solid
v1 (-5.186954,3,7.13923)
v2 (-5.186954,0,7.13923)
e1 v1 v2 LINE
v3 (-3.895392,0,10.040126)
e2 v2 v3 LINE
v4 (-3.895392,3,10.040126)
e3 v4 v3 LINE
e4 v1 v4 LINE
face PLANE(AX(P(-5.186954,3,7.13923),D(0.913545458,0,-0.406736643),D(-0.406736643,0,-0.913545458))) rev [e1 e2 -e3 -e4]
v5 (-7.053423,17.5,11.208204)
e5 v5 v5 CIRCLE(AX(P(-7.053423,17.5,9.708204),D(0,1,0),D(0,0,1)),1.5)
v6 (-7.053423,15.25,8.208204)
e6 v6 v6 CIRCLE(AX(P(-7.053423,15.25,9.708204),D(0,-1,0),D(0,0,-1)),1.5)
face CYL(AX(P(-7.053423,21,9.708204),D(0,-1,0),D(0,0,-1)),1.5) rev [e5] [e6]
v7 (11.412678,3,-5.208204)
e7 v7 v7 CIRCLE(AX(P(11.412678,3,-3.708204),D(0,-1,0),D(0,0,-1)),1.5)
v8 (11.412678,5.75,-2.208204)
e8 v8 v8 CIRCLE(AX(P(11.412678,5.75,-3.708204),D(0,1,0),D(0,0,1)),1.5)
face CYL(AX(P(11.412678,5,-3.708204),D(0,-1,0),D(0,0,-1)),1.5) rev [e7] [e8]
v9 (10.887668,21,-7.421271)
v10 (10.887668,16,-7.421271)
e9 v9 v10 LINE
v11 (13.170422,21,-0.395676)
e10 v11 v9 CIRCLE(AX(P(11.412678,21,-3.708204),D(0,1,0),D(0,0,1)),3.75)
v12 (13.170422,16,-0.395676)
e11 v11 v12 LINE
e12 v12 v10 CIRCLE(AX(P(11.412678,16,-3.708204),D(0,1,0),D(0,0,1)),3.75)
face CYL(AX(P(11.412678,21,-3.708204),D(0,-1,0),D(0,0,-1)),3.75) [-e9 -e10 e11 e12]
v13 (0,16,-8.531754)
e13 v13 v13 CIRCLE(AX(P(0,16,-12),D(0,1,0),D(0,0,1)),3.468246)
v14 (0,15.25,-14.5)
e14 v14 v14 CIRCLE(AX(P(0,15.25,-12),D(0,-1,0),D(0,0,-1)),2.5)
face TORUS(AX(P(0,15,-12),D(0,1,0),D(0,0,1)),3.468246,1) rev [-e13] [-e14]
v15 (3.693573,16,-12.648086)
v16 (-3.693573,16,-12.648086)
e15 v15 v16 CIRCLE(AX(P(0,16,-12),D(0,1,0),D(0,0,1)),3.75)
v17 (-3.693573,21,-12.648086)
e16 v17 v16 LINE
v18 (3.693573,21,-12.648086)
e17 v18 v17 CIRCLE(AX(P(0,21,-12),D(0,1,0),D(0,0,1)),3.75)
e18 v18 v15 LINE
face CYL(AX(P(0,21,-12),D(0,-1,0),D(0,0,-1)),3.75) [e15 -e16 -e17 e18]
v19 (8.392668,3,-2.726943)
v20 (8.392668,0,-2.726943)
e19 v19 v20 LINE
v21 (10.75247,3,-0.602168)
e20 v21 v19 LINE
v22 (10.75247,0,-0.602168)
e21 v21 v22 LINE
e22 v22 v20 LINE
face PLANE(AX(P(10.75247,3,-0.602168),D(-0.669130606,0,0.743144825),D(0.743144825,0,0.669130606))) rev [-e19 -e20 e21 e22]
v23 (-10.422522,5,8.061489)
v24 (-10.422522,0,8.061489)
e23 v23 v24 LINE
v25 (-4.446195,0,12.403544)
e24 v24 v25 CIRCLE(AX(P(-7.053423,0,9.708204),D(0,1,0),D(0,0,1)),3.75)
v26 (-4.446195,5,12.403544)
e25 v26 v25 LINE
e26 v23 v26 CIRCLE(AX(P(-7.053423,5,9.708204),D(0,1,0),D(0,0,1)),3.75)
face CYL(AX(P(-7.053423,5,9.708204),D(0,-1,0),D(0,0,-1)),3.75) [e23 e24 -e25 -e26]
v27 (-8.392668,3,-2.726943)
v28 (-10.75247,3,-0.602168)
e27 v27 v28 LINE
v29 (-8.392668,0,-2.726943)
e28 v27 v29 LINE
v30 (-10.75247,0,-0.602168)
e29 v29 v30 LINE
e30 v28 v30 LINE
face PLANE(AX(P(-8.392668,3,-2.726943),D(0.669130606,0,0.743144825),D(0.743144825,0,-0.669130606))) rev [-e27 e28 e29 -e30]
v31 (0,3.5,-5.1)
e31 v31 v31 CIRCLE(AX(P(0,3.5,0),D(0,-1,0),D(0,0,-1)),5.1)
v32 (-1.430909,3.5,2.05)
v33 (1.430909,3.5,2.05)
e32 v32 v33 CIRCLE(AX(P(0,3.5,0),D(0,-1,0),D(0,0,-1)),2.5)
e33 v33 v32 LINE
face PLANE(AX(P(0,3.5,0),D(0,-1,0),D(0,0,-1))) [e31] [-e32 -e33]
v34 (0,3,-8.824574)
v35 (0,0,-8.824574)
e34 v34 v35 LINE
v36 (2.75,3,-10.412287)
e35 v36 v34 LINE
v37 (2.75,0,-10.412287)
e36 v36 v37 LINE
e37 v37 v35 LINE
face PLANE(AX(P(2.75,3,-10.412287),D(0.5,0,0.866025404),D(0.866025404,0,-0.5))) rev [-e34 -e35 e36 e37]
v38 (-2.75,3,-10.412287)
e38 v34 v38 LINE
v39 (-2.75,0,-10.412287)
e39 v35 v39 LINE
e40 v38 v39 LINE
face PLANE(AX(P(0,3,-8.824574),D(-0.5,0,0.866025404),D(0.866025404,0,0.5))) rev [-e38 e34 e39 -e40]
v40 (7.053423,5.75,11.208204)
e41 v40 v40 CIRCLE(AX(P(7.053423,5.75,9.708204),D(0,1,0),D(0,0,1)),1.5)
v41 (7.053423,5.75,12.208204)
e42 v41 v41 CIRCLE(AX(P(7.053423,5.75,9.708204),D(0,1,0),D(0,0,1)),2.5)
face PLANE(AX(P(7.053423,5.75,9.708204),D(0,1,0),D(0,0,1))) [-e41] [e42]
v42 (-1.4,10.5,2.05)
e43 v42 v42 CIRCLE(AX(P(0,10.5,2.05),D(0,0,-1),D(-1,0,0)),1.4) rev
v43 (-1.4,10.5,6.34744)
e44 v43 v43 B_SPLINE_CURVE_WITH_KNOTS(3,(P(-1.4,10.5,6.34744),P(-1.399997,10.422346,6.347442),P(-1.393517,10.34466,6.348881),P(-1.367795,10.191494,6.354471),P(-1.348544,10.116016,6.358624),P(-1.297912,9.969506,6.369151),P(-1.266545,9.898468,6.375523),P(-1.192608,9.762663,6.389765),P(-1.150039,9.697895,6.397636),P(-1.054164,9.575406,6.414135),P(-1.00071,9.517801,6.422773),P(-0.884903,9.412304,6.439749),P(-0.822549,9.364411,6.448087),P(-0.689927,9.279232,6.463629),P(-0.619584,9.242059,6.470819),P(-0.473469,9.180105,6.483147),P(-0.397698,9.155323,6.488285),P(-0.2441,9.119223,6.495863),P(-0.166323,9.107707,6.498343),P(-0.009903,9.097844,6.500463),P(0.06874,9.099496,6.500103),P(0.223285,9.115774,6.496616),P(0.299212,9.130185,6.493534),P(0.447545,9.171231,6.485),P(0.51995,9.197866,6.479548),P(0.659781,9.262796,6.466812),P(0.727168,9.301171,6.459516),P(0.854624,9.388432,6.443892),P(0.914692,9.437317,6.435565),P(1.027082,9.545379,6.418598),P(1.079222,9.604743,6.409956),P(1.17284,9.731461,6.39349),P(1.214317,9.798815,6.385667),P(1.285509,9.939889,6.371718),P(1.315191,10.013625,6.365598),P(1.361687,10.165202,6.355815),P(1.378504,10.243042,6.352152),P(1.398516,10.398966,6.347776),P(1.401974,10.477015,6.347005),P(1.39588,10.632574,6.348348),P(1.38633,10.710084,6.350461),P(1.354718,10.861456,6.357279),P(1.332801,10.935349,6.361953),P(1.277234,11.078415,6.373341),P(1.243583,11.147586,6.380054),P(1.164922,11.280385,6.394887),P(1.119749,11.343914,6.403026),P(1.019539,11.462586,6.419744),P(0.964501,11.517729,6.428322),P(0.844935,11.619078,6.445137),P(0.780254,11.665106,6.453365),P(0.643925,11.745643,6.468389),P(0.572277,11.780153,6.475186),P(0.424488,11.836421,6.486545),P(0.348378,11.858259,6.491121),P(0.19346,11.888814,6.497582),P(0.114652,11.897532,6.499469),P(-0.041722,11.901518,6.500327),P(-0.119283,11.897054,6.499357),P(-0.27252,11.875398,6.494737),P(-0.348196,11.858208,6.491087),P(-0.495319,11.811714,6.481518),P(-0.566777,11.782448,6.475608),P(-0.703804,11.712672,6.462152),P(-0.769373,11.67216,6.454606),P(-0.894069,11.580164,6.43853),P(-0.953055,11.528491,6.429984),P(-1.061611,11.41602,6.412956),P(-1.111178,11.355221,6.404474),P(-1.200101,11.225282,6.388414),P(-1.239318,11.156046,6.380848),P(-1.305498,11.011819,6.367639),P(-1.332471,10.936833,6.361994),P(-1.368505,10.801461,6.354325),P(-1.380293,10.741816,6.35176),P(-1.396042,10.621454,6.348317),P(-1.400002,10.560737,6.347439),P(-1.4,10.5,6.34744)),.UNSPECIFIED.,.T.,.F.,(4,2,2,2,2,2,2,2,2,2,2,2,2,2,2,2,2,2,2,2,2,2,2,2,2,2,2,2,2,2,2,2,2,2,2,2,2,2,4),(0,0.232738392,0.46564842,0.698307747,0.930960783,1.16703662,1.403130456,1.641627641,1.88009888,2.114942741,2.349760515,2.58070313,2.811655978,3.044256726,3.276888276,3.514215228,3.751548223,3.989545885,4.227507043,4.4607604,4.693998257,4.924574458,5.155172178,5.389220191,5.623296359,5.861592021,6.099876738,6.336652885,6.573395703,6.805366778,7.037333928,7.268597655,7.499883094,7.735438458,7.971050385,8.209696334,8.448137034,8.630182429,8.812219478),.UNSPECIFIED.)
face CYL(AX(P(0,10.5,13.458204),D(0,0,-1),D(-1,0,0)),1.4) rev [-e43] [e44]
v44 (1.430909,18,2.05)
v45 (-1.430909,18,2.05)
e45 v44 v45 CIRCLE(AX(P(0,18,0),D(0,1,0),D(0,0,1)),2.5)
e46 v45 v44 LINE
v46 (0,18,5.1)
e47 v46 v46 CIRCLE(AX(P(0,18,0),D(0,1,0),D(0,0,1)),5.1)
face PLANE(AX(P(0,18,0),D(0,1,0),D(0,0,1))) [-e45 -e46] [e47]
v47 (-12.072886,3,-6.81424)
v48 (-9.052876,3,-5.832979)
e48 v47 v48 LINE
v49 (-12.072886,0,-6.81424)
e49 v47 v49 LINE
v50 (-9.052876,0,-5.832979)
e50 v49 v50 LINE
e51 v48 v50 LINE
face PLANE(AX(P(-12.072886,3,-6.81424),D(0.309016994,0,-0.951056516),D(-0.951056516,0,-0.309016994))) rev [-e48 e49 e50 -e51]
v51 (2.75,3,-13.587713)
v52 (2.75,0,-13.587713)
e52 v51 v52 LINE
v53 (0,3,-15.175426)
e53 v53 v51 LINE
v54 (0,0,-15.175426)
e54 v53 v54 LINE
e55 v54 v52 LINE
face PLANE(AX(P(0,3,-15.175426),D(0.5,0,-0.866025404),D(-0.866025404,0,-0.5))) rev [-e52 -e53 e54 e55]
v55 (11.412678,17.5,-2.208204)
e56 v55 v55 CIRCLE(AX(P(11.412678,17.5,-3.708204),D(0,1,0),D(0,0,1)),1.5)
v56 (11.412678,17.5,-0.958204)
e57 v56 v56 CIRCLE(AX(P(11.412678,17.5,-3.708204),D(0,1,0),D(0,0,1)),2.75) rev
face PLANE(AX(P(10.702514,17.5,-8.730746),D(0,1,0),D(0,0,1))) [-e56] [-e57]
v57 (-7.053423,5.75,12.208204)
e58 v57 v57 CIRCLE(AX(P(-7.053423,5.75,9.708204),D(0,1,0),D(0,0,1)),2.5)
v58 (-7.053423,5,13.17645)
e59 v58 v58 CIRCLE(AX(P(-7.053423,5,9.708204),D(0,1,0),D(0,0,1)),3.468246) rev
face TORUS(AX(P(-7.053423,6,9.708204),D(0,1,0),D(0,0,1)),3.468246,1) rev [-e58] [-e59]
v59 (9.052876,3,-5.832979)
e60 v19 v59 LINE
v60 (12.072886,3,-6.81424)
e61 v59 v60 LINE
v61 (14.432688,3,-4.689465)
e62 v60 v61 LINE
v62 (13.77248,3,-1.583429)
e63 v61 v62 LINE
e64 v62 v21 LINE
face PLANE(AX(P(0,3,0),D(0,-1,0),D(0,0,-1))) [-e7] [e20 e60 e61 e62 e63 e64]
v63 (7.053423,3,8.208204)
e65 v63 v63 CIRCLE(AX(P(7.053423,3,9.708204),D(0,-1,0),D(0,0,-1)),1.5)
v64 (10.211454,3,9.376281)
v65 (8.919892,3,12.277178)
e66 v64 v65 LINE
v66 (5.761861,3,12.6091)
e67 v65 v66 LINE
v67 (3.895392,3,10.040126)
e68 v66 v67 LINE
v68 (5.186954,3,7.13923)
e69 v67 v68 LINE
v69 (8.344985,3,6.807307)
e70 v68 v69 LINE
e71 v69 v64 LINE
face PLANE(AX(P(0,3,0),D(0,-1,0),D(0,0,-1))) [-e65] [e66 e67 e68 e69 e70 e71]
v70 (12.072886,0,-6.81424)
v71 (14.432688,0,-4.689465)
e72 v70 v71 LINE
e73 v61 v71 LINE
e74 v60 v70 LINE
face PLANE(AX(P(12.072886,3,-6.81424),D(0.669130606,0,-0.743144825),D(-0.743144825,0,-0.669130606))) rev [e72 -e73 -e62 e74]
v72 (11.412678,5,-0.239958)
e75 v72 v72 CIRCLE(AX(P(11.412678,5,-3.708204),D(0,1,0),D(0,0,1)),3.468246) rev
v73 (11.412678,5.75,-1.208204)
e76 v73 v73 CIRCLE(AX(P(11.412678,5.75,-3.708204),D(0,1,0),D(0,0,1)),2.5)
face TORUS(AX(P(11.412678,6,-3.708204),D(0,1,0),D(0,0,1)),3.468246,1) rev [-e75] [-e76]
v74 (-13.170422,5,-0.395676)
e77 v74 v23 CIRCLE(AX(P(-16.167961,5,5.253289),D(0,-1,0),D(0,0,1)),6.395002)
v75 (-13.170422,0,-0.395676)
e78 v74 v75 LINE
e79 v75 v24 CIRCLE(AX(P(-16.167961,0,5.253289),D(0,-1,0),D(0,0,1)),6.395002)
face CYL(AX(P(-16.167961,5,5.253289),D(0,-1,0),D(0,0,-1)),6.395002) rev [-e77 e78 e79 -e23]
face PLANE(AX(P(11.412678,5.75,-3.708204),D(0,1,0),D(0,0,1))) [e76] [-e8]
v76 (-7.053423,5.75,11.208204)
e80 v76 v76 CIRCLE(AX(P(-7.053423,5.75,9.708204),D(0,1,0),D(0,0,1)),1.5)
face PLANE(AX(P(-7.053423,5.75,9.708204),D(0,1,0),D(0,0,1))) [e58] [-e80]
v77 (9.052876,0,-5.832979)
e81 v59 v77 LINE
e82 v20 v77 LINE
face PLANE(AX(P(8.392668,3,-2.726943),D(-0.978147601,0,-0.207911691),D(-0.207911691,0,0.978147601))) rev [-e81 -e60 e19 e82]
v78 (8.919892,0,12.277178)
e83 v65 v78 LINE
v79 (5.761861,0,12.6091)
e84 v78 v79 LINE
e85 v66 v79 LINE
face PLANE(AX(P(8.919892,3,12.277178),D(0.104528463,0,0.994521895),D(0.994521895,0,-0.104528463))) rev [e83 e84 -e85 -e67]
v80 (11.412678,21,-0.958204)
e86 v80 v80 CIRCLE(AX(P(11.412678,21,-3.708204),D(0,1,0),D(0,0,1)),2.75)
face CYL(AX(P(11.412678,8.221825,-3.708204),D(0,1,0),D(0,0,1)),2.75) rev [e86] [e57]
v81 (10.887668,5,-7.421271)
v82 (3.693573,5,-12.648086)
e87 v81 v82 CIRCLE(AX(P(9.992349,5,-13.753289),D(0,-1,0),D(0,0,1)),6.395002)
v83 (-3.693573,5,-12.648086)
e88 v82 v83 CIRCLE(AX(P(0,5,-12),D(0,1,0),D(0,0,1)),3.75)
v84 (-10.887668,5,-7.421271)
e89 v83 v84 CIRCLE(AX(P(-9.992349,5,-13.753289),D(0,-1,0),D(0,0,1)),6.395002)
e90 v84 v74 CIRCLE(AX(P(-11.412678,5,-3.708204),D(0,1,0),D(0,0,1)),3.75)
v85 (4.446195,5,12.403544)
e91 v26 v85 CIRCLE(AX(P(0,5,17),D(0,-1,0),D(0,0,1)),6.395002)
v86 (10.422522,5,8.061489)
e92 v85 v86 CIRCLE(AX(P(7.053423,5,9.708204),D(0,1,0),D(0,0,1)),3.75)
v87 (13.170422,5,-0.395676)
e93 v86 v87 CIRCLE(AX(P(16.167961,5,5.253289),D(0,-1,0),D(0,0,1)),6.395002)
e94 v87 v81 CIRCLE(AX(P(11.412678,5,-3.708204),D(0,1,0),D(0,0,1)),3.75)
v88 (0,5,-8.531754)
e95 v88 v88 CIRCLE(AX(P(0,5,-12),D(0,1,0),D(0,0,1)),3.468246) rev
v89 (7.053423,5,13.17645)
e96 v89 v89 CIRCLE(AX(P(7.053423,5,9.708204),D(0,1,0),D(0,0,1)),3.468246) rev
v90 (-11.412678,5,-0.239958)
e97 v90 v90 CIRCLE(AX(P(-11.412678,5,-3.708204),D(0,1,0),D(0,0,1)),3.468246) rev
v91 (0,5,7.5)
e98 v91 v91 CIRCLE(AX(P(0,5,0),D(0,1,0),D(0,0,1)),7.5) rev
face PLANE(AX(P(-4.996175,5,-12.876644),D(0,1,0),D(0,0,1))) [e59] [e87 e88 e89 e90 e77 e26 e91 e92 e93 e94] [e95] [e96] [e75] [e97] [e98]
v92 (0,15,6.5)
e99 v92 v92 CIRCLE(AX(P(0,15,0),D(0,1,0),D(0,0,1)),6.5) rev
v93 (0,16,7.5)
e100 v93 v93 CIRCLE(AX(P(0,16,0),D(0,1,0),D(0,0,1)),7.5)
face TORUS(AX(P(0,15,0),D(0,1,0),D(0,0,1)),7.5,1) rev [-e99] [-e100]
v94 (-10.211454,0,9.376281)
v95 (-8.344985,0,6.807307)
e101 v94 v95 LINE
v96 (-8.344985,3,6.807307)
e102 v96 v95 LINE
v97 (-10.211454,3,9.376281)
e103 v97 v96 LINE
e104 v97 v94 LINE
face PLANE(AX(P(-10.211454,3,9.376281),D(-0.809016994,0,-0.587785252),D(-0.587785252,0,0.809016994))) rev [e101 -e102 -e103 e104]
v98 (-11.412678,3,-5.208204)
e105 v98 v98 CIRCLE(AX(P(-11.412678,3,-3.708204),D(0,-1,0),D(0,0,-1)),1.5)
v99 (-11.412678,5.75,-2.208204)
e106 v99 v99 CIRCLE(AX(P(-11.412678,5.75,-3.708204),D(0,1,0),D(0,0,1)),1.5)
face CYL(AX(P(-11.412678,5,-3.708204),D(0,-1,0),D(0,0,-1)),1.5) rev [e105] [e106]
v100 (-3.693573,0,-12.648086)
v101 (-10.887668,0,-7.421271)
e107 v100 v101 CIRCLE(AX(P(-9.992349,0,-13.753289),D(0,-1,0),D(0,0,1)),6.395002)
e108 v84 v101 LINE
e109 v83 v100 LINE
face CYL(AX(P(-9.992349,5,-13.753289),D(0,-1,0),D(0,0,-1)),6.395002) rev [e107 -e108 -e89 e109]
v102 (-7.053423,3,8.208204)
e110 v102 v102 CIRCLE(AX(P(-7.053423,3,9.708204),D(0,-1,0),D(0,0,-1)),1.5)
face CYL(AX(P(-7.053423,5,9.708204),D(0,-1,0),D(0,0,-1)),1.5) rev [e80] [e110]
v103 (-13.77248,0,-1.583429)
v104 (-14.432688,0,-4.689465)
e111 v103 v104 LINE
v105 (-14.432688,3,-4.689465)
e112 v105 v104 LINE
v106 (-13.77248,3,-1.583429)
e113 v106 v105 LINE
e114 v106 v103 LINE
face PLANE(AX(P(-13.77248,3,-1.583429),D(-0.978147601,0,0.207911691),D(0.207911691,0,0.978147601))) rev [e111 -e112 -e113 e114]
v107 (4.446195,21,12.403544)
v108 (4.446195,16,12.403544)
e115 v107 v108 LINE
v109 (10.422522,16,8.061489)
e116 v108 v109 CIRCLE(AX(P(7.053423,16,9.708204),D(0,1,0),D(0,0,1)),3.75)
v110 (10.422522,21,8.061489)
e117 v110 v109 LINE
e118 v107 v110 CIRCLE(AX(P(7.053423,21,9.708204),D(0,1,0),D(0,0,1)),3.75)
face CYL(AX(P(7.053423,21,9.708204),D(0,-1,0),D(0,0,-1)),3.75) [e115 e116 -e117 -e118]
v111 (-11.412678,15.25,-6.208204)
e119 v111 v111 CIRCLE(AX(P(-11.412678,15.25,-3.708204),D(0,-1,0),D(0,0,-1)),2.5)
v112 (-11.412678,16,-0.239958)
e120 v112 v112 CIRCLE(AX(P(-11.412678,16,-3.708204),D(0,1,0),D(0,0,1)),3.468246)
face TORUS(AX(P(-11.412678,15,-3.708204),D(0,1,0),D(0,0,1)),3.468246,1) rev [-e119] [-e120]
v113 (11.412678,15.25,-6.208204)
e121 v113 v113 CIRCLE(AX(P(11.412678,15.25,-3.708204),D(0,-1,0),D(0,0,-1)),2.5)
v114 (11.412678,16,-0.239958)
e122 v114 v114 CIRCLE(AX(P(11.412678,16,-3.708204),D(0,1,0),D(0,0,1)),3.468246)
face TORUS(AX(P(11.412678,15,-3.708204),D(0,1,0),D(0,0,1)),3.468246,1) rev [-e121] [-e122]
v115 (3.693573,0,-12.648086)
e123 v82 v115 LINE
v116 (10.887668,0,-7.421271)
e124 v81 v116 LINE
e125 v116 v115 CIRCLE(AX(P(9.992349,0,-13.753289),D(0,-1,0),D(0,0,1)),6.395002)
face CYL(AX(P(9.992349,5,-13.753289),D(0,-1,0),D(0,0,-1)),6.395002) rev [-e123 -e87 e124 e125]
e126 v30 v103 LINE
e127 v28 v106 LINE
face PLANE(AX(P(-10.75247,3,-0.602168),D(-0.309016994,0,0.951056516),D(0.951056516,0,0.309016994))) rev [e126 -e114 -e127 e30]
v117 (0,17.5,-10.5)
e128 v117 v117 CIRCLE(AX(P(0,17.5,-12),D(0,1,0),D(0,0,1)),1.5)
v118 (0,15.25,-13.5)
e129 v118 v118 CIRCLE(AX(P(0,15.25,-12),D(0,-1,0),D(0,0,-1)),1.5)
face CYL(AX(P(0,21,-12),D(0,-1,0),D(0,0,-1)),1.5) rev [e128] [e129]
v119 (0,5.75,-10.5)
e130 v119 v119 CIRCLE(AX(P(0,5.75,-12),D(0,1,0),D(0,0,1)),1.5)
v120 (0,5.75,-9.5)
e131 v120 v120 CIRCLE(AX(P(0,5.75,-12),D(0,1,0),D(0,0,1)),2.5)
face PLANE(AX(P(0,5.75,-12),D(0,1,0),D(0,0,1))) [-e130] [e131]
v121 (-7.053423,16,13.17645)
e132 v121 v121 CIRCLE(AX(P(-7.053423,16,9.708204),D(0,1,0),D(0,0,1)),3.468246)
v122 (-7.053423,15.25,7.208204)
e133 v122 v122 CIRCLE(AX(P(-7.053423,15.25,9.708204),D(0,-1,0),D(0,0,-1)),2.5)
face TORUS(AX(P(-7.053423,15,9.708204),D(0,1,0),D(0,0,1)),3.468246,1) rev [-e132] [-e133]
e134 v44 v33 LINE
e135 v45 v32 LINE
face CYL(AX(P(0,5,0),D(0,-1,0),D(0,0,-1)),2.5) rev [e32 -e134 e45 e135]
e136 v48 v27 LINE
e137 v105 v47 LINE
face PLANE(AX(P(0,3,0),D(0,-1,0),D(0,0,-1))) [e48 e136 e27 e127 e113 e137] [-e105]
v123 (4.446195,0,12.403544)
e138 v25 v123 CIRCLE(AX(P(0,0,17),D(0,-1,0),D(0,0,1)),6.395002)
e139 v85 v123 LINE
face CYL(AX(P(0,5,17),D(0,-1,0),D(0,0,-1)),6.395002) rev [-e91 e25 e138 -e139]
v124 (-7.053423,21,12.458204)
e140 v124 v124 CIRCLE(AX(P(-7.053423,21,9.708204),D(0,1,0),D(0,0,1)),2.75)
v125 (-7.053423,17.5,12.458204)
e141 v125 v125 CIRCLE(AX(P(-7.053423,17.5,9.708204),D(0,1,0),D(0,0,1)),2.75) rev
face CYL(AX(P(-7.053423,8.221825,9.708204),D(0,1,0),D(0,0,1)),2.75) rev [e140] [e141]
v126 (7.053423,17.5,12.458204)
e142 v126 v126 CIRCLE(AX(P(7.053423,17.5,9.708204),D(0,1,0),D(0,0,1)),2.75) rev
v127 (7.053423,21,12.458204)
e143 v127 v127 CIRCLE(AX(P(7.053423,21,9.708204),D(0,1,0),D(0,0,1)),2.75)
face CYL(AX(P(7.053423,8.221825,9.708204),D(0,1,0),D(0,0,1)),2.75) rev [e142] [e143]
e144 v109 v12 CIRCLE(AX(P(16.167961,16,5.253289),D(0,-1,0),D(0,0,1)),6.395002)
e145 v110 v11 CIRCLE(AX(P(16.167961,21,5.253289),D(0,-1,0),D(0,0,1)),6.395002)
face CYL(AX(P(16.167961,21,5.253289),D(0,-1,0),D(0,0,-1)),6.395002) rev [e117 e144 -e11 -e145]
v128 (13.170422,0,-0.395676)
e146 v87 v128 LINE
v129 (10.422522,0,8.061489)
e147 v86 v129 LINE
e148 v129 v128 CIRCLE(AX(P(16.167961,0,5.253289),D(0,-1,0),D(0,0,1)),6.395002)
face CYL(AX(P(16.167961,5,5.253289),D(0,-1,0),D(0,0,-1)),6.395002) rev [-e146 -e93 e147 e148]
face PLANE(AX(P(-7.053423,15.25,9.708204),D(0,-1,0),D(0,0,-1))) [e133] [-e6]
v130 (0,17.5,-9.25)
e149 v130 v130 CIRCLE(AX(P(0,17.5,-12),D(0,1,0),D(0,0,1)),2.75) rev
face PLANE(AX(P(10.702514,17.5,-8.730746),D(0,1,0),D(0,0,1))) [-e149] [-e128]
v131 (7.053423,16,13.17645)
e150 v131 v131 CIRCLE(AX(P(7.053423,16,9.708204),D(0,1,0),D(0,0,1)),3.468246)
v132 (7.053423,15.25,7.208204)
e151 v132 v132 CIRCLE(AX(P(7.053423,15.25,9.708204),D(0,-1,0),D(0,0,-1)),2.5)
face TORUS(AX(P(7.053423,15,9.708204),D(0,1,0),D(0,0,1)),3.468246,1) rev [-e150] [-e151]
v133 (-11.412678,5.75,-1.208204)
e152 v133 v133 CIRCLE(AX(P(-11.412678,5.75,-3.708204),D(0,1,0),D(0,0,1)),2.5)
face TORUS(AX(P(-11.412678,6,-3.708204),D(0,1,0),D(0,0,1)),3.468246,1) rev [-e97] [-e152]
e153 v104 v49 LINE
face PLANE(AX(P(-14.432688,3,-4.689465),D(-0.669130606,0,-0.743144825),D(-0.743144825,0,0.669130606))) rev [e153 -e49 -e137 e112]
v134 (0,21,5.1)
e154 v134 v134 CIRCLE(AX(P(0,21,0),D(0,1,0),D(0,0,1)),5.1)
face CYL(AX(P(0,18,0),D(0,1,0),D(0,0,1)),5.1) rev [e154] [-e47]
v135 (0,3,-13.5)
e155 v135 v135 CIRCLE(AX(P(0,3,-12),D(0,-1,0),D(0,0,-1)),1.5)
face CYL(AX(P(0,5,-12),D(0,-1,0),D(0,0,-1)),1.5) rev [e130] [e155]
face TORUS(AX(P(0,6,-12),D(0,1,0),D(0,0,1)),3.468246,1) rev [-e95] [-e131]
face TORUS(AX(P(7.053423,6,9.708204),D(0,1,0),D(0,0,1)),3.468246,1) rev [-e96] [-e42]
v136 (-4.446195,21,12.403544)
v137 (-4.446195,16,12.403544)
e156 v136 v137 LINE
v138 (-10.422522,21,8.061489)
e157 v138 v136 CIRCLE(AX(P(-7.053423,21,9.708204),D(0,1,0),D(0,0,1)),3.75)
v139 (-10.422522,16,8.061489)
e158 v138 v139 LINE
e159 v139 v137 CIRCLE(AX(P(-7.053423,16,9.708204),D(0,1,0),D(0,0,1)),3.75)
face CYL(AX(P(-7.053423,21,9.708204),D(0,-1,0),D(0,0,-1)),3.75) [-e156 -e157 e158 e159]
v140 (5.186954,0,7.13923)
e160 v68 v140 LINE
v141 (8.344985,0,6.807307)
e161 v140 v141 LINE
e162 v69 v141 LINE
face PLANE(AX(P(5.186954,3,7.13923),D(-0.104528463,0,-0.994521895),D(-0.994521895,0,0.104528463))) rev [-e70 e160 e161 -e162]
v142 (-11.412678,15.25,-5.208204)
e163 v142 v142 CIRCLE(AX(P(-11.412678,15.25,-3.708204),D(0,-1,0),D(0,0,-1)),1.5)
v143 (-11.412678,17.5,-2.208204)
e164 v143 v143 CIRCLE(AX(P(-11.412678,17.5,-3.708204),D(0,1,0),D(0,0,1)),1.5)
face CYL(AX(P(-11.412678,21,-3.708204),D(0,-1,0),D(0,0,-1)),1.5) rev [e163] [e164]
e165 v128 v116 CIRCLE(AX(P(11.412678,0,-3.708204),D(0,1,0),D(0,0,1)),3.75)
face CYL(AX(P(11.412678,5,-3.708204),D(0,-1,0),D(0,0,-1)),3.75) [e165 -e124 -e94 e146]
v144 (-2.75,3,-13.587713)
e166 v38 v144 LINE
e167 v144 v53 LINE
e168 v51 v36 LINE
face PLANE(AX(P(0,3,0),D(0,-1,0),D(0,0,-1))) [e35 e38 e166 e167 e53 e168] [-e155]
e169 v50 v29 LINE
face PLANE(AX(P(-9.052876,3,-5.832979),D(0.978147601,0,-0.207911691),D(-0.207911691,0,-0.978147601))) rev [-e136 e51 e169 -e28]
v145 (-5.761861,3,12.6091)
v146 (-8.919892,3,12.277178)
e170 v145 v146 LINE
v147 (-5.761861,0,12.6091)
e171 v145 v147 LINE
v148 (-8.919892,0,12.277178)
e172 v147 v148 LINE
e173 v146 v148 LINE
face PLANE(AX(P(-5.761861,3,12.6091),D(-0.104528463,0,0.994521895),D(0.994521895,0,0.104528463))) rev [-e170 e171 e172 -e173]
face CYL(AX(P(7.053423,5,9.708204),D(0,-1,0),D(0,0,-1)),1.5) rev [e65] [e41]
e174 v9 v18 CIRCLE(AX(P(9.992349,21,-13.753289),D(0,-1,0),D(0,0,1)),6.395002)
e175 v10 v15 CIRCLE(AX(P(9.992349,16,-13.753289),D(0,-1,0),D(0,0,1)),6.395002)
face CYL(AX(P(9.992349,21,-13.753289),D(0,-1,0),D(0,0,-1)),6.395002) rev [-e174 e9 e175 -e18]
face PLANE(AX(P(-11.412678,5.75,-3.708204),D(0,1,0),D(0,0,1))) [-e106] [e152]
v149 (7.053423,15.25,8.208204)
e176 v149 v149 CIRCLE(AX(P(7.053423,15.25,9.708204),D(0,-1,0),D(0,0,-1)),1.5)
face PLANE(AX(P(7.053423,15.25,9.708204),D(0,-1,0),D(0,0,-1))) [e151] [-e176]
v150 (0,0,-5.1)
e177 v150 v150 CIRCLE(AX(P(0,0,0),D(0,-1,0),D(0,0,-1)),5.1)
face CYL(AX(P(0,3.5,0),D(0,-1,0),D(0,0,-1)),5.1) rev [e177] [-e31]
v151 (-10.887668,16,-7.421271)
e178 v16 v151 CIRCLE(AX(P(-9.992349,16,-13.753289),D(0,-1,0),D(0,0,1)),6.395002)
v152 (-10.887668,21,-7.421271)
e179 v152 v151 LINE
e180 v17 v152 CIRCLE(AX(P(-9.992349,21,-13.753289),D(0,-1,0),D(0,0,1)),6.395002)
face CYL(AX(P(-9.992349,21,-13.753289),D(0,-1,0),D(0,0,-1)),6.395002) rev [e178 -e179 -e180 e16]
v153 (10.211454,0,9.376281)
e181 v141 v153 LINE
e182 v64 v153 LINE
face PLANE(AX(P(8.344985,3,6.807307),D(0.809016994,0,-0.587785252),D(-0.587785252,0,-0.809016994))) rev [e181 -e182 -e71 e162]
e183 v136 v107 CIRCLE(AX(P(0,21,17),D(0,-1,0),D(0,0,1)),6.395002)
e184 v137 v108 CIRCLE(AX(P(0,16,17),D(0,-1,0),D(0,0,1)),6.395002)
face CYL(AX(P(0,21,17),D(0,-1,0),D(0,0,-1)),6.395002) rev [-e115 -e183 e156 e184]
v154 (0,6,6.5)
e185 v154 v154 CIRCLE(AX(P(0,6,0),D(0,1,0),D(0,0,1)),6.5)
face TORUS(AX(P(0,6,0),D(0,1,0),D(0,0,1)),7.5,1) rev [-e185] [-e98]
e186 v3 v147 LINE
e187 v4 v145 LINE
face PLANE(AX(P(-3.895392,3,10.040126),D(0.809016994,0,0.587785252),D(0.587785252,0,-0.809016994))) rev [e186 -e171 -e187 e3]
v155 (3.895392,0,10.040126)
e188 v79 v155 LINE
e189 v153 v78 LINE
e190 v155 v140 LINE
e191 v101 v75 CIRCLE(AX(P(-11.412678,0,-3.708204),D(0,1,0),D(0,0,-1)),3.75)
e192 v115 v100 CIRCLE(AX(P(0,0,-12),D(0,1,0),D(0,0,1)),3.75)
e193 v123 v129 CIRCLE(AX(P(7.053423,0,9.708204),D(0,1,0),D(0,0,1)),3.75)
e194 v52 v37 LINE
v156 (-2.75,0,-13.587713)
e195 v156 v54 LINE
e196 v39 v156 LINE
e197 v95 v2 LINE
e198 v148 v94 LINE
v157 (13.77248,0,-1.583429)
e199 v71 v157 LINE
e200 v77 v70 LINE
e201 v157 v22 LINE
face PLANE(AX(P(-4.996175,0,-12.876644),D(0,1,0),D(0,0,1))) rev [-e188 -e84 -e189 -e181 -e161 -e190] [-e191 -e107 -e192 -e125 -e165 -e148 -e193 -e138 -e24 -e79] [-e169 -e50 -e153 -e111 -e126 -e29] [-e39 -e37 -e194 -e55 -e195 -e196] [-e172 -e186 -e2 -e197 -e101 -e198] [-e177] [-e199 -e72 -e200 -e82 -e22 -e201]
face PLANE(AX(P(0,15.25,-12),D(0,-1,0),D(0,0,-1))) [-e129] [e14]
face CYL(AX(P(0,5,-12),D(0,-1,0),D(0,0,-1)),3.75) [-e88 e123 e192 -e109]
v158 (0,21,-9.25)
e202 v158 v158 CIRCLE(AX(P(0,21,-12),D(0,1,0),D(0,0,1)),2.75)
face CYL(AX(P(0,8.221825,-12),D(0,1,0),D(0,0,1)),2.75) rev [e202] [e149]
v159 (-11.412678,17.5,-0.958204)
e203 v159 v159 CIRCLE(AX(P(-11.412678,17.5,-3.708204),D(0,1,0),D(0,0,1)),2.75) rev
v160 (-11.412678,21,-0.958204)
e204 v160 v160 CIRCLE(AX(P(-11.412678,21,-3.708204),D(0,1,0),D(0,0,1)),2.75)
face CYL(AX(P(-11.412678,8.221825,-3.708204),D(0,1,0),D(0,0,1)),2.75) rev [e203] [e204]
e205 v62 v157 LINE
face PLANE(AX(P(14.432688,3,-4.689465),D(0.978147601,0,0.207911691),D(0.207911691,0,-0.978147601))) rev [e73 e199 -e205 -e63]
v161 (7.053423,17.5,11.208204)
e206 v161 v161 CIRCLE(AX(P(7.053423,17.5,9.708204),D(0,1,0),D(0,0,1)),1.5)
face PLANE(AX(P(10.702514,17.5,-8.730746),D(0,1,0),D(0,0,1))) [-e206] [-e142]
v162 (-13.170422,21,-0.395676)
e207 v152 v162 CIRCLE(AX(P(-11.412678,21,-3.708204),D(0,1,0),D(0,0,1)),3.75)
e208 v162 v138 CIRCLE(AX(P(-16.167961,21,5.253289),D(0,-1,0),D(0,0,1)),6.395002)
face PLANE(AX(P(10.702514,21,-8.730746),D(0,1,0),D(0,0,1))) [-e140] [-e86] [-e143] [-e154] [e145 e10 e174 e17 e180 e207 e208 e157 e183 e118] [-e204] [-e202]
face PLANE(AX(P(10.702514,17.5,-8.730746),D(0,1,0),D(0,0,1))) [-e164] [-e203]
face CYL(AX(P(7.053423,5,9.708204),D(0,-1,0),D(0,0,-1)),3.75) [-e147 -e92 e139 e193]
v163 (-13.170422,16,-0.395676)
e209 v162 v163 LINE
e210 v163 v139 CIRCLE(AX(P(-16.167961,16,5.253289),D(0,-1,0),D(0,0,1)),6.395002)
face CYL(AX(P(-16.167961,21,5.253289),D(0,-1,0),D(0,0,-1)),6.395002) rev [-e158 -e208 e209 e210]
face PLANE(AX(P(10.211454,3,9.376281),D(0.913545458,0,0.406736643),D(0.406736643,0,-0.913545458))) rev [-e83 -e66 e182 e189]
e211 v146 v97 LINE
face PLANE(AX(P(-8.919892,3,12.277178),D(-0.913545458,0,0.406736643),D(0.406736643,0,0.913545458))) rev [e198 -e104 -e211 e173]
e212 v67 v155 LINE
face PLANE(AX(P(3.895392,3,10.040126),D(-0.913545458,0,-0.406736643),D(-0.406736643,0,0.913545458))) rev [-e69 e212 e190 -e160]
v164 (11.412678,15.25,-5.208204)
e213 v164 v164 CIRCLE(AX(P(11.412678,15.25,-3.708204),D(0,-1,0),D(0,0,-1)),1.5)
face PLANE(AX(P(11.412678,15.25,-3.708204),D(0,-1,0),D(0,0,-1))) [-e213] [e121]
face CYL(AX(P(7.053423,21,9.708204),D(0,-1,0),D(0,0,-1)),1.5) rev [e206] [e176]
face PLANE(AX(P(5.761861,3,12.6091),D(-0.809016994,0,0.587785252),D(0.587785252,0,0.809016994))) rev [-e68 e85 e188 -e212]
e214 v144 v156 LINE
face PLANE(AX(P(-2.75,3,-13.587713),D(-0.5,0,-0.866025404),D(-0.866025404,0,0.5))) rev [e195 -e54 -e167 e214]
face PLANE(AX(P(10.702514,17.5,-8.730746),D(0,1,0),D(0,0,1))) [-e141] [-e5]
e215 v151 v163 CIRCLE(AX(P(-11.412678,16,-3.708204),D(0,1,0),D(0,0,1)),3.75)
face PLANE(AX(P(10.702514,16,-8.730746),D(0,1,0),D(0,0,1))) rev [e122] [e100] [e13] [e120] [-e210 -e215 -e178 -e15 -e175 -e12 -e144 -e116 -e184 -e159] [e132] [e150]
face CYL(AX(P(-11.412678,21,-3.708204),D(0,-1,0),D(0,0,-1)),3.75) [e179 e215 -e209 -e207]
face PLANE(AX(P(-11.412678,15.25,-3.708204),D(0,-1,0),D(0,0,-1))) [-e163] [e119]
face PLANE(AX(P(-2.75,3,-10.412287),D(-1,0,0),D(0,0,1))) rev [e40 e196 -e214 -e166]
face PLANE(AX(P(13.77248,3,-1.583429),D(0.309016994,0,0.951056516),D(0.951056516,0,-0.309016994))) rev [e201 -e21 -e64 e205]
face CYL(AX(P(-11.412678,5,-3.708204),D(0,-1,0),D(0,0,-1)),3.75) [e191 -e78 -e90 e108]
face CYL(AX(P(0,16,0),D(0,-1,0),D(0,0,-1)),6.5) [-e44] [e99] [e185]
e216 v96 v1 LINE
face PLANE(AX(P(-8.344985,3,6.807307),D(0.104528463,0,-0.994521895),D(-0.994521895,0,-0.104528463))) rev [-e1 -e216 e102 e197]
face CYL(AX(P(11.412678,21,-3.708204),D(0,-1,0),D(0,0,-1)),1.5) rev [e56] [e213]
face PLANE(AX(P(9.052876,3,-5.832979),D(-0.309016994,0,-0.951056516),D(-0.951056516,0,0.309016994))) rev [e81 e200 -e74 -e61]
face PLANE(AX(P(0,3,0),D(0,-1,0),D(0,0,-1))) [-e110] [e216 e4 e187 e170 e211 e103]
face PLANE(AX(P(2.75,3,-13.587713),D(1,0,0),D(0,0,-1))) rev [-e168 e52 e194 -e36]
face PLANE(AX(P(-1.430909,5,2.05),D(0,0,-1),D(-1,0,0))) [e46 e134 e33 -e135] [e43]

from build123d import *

# Parameters (mm, degrees)
SKETCH1_R           = 1.5
BOSS_EXTRUDE1_DEPTH = 5
SKETCH2_R           = 6.5
BOSS_EXTRUDE2_DEPTH = 11
SKETCH3_R           = 1.5
BOSS_EXTRUDE3_DEPTH = 5
SKETCH4_R           = 1.4
CUT_EXTRUDE1_DEPTH  = 31.314506594
FILLET1_R           = 1
CUT_EXTRUDE2_DEPTH  = 3
SKETCH8_R           = 2.5
SKETCH8_R_2         = 1.5
BOSS_EXTRUDE5_DEPTH = 0.75
FILLET4_R           = 1
BOSS_EXTRUDE6_START = 0.75
SKETCH9_R           = 2.5
SKETCH9_R_2         = 1.5
BOSS_EXTRUDE6_DEPTH = 0.75
FILLET5_R           = 1
SKETCH12_R          = 2.75
CUT_EXTRUDE5_DEPTH  = 3.5
SKETCH10_R          = 5.1
CUT_EXTRUDE3_DEPTH  = 3
CUT_EXTRUDE4_START  = -3.5
SKETCH11_R          = 5.1
CUT_EXTRUDE4_DEPTH  = 3.5


with BuildPart() as part:
    # Sketch1 → Boss-Extrude1 (new body)
    with BuildSketch(Plane(origin=(0, 0, 0), x_dir=(1, 0, 0), z_dir=(0, 1, 0))):
        with BuildLine():
            ThreePointArc((-10.887667616, 7.421270575), (-6.233461404, 8.579623579), (-3.693573417, 12.648085961))
            ThreePointArc((-3.693573417, 12.648085961), (0, 15.75), (3.693573417, 12.648085961))
            ThreePointArc((3.693573417, 12.648085961), (6.233461404, 8.579623579), (10.887667616, 7.421270575))
            ThreePointArc((10.887667616, 7.421270575), (14.979140132, 4.867017661), (13.170421528, 0.395676441))
            ThreePointArc((13.170421528, 0.395676441), (10.08595242, -3.277124596), (10.422522062, -8.061488506))
            ThreePointArc((10.422522062, -8.061488506), (9.257617724, -12.742017661), (4.446194733, -12.403544471))
            ThreePointArc((4.446194733, -12.403544471), (0, -10.604997965), (-4.446194733, -12.403544471))
            ThreePointArc((-4.446194733, -12.403544471), (-9.257617724, -12.742017661), (-10.422522062, -8.061488506))
            ThreePointArc((-10.422522062, -8.061488506), (-10.08595242, -3.277124596), (-13.170421528, 0.395676441))
            ThreePointArc((-13.170421528, 0.395676441), (-14.889028798, 2.301972625), (-14.979140132, 4.867017661))
            ThreePointArc((-14.979140132, 4.867017661), (-13.398542888, 6.889216574), (-10.887667616, 7.421270575))
        make_face()
        with Locations(Location((0, 12, 0), (0, 0, 270))):
            Circle(SKETCH1_R, mode=Mode.SUBTRACT)
        with Locations(Location((11.412678196, 3.708203932, 0), (0, 0, 270))):
            Circle(SKETCH1_R, mode=Mode.SUBTRACT)
        with Locations(Location((7.053423028, -9.708203932, 0), (0, 0, 270))):
            Circle(SKETCH1_R, mode=Mode.SUBTRACT)
        with Locations(Location((-7.053423028, -9.708203932, 0), (0, 0, 270))):
            Circle(SKETCH1_R, mode=Mode.SUBTRACT)
        with Locations(Location((-11.412678196, 3.708203932, 0), (0, 0, 270))):
            Circle(SKETCH1_R, mode=Mode.SUBTRACT)
        with BuildLine():
            Line((-1.430908802, -2.05), (1.430908802, -2.05))
            ThreePointArc((1.430908802, -2.05), (0, 2.5), (-1.430908802, -2.05))
        make_face(mode=Mode.SUBTRACT)
    extrude(amount=BOSS_EXTRUDE1_DEPTH)

    # Sketch2 → Boss-Extrude2 (add)
    with BuildSketch(Plane(origin=(0, 5, 0), x_dir=(1, 0, 0), z_dir=(0, 1, 0))):
        with Locations(Location((0, 0, 0), (0, 0, 270))):
            Circle(SKETCH2_R)
        with BuildLine():
            Line((-1.430908802, -2.05), (1.430908802, -2.05))
            ThreePointArc((1.430908802, -2.05), (0, 2.5), (-1.430908802, -2.05))
        make_face(mode=Mode.SUBTRACT)
    extrude(amount=BOSS_EXTRUDE2_DEPTH)

    # Sketch3 → Boss-Extrude3 (add)
    with BuildSketch(Plane(origin=(0, 16, 0), x_dir=(1, 0, 0), z_dir=(0, 1, 0))):
        with BuildLine():
            ThreePointArc((3.693573417, 12.648085961), (0, 15.75), (-3.693573417, 12.648085961))
            ThreePointArc((-3.693573417, 12.648085961), (-6.233461404, 8.579623579), (-10.887667616, 7.421270575))
            ThreePointArc((-10.887667616, 7.421270575), (-14.979140132, 4.867017661), (-13.170421528, 0.395676441))
            ThreePointArc((-13.170421528, 0.395676441), (-10.08595242, -3.277124596), (-10.422522062, -8.061488506))
            ThreePointArc((-10.422522062, -8.061488506), (-9.257617724, -12.742017661), (-4.446194733, -12.403544471))
            ThreePointArc((-4.446194733, -12.403544471), (0, -10.604997965), (4.446194733, -12.403544471))
            ThreePointArc((4.446194733, -12.403544471), (9.257617724, -12.742017661), (10.422522062, -8.061488506))
            ThreePointArc((10.422522062, -8.061488506), (10.08595242, -3.277124596), (13.170421528, 0.395676441))
            ThreePointArc((13.170421528, 0.395676441), (14.979140132, 4.867017661), (10.887667616, 7.421270575))
            ThreePointArc((10.887667616, 7.421270575), (6.233461404, 8.579623579), (3.693573417, 12.648085961))
        make_face()
        with Locations(Location((-7.053423028, -9.708203932, 0), (0, 0, 270))):
            Circle(SKETCH3_R, mode=Mode.SUBTRACT)
        with Locations(Location((7.053423028, -9.708203932, 0), (0, 0, 270))):
            Circle(SKETCH3_R, mode=Mode.SUBTRACT)
        with Locations(Location((11.412678196, 3.708203932, 0), (0, 0, 270))):
            Circle(SKETCH3_R, mode=Mode.SUBTRACT)
        with Locations(Location((-11.412678196, 3.708203932, 0), (0, 0, 270))):
            Circle(SKETCH3_R, mode=Mode.SUBTRACT)
        with Locations(Location((0, 12, 0), (0, 0, 270))):
            Circle(SKETCH3_R, mode=Mode.SUBTRACT)
        with BuildLine():
            Line((-1.430908802, -2.05), (1.430908802, -2.05))
            ThreePointArc((1.430908802, -2.05), (0, 2.5), (-1.430908802, -2.05))
        make_face(mode=Mode.SUBTRACT)
    extrude(amount=BOSS_EXTRUDE3_DEPTH)

    # Sketch4 → Cut-Extrude1 (cut, through all)
    with BuildSketch(Plane.XY):
        with Locations(Location((0, 10.5, 0), (0, 0, 180))):
            Circle(SKETCH4_R)
    extrude(amount=CUT_EXTRUDE1_DEPTH, mode=Mode.SUBTRACT)

    # Fillet1
    fillet1_edges = [part.edges().sort_by_distance(p)[0] for p in [
        (0, 16, -6.5),
        (0, 5, -6.5),
    ]]
    fillet(fillet1_edges, radius=FILLET1_R)

    # Sketch6 → Cut-Extrude2 (cut)
    with BuildSketch(Plane.XZ):
        Polygon((-12.072886484, -6.814239726), (-9.052876438, -5.832978979), (-8.392668149, -2.726943186), (-10.752469907, -0.602168139), (-13.772479953, -1.583428886), (-14.432688242, -4.689464679), align=None)
        Polygon((2.75, -13.58771324), (2.75, -10.41228676), (0, -8.824573519), (-2.75, -10.41228676), (-2.75, -13.58771324), (0, -15.175426481), align=None)
        Polygon((-10.21145419, 9.376281482), (-8.344985335, 6.807307495), (-5.186954173, 7.139229945), (-3.895391865, 10.040126383), (-5.76186072, 12.60910037), (-8.919891883, 12.27717792), align=None)
        Polygon((5.76186072, 12.60910037), (3.895391865, 10.040126383), (5.186954173, 7.139229945), (8.344985335, 6.807307495), (10.21145419, 9.376281482), (8.919891883, 12.27717792), align=None)
        Polygon((13.772479953, -1.583428886), (10.752469907, -0.602168139), (8.392668149, -2.726943186), (9.052876438, -5.832978979), (12.072886484, -6.814239726), (14.432688242, -4.689464679), align=None)
    extrude(amount=-CUT_EXTRUDE2_DEPTH, mode=Mode.SUBTRACT)

    # Sketch8 → Boss-Extrude5 (add)
    # profile 1 of 5: a face of its own
    with BuildSketch(Plane(origin=(0, 5, 0), x_dir=(1, 0, 0), z_dir=(0, 1, 0))):
        with Locations(Location((-7.053423028, -9.708203932, 0), (0, 0, 270))):
            Circle(SKETCH8_R)
        with Locations(Location((-7.053423028, -9.708203932, 0), (0, 0, 90))):
            Circle(SKETCH8_R_2, mode=Mode.SUBTRACT)
    # profile 2 of 5: a face of its own
    with BuildSketch(Plane(origin=(0, 5, 0), x_dir=(1, 0, 0), z_dir=(0, 1, 0))):
        with Locations(Location((-11.412678196, 3.708203932, 0), (0, 0, 270))):
            Circle(SKETCH8_R)
        with Locations(Location((-11.412678196, 3.708203932, 0), (0, 0, 90))):
            Circle(SKETCH8_R_2, mode=Mode.SUBTRACT)
    # profile 3 of 5: a face of its own
    with BuildSketch(Plane(origin=(0, 5, 0), x_dir=(1, 0, 0), z_dir=(0, 1, 0))):
        with Locations(Location((0, 12, 0), (0, 0, 270))):
            Circle(SKETCH8_R)
        with Locations(Location((0, 12, 0), (0, 0, 90))):
            Circle(SKETCH8_R_2, mode=Mode.SUBTRACT)
    # profile 4 of 5: a face of its own
    with BuildSketch(Plane(origin=(0, 5, 0), x_dir=(1, 0, 0), z_dir=(0, 1, 0))):
        with Locations(Location((11.412678196, 3.708203932, 0), (0, 0, 270))):
            Circle(SKETCH8_R)
        with Locations(Location((11.412678196, 3.708203932, 0), (0, 0, 90))):
            Circle(SKETCH8_R_2, mode=Mode.SUBTRACT)
    # profile 5 of 5: a face of its own
    with BuildSketch(Plane(origin=(0, 5, 0), x_dir=(1, 0, 0), z_dir=(0, 1, 0))):
        with Locations(Location((7.053423028, -9.708203932, 0), (0, 0, 270))):
            Circle(SKETCH8_R)
        with Locations(Location((7.053423028, -9.708203932, 0), (0, 0, 90))):
            Circle(SKETCH8_R_2, mode=Mode.SUBTRACT)
    extrude(amount=BOSS_EXTRUDE5_DEPTH)

    # Fillet4
    # the kernel refuses this fillet: 1 mm, written as the material it adds along each edge
    with BuildSketch(Plane(origin=(-7.053423028, 5, 9.708203932), x_dir=(0, 0, 1), z_dir=(-1, 0, 0))) as fillet4_piece_1:
        with BuildLine():
            CenterArc((3.468245837, 1), FILLET4_R, 194.477512186, 75.522487814)
            Line((2.5, 0.75), (2.480635083, 0.745))
            ThreePointArc((2.480635083, 0.745), (2.48, 0.375), (2.48, 0))
            Line((2.48, 0), (2.5, -0.02))
            Line((2.5, -0.02), (3.468245837, -0.02))
            Line((3.468245837, -0.02), (3.468245837, 0))
        make_face()
    revolve(axis=Axis((-7.053423028, 5, 9.708203932), (0, 1, 0)))
    with BuildSketch(Plane(origin=(-11.412678196, 5, -3.708203932), x_dir=(0, 0, 1), z_dir=(-1, 0, 0))) as fillet4_piece_2:
        with BuildLine():
            CenterArc((3.468245837, 1), FILLET4_R, 194.477512186, 75.522487814)
            Line((2.5, 0.75), (2.480635083, 0.745))
            ThreePointArc((2.480635083, 0.745), (2.48, 0.375), (2.48, 0))
            Line((2.48, 0), (2.5, -0.02))
            Line((2.5, -0.02), (3.468245837, -0.02))
            Line((3.468245837, -0.02), (3.468245837, 0))
        make_face()
    revolve(axis=Axis((-11.412678196, 5, -3.708203932), (0, 1, 0)))
    with BuildSketch(Plane(origin=(0, 5, -12), x_dir=(0, 0, 1), z_dir=(-1, 0, 0))) as fillet4_piece_3:
        with BuildLine():
            CenterArc((3.468245837, 1), FILLET4_R, 194.477512186, 75.522487814)
            Line((2.5, 0.75), (2.480635083, 0.745))
            ThreePointArc((2.480635083, 0.745), (2.48, 0.375), (2.48, 0))
            Line((2.48, 0), (2.5, -0.02))
            Line((2.5, -0.02), (3.468245837, -0.02))
            Line((3.468245837, -0.02), (3.468245837, 0))
        make_face()
    revolve(axis=Axis((0, 5, -12), (0, 1, 0)))
    with BuildSketch(Plane(origin=(11.412678196, 5, -3.708203932), x_dir=(0, 0, 1), z_dir=(-1, 0, 0))) as fillet4_piece_4:
        with BuildLine():
            CenterArc((3.468245837, 1), FILLET4_R, 194.477512186, 75.522487814)
            Line((2.5, 0.75), (2.480635083, 0.745))
            ThreePointArc((2.480635083, 0.745), (2.48, 0.375), (2.48, 0))
            Line((2.48, 0), (2.5, -0.02))
            Line((2.5, -0.02), (3.468245837, -0.02))
            Line((3.468245837, -0.02), (3.468245837, 0))
        make_face()
    revolve(axis=Axis((11.412678196, 5, -3.708203932), (0, 1, 0)))
    with BuildSketch(Plane(origin=(7.053423028, 5, 9.708203932), x_dir=(0, 0, 1), z_dir=(-1, 0, 0))) as fillet4_piece_5:
        with BuildLine():
            CenterArc((3.468245837, 1), FILLET4_R, 194.477512186, 75.522487814)
            Line((2.5, 0.75), (2.480635083, 0.745))
            ThreePointArc((2.480635083, 0.745), (2.48, 0.375), (2.48, 0))
            Line((2.48, 0), (2.5, -0.02))
            Line((2.5, -0.02), (3.468245837, -0.02))
            Line((3.468245837, -0.02), (3.468245837, 0))
        make_face()
    revolve(axis=Axis((7.053423028, 5, 9.708203932), (0, 1, 0)))

    # Sketch9 → Boss-Extrude6 (add)
    # profile 1 of 5: a face of its own
    with BuildSketch(Plane.XZ.offset(-16).offset(BOSS_EXTRUDE6_START)):
        with Locations(Location((0, -12, 0), (0, 0, 90))):
            Circle(SKETCH9_R)
        with Locations(Location((0, -12, 0), (0, 0, 270))):
            Circle(SKETCH9_R_2, mode=Mode.SUBTRACT)
    # profile 2 of 5: a face of its own
    with BuildSketch(Plane.XZ.offset(-16).offset(BOSS_EXTRUDE6_START)):
        with Locations(Location((-11.412678196, -3.708203932, 0), (0, 0, 90))):
            Circle(SKETCH9_R)
        with Locations(Location((-11.412678196, -3.708203932, 0), (0, 0, 270))):
            Circle(SKETCH9_R_2, mode=Mode.SUBTRACT)
    # profile 3 of 5: a face of its own
    with BuildSketch(Plane.XZ.offset(-16).offset(BOSS_EXTRUDE6_START)):
        with Locations(Location((-7.053423028, 9.708203932, 0), (0, 0, 90))):
            Circle(SKETCH9_R)
        with Locations(Location((-7.053423028, 9.708203932, 0), (0, 0, 270))):
            Circle(SKETCH9_R_2, mode=Mode.SUBTRACT)
    # profile 4 of 5: a face of its own
    with BuildSketch(Plane.XZ.offset(-16).offset(BOSS_EXTRUDE6_START)):
        with Locations(Location((7.053423028, 9.708203932, 0), (0, 0, 90))):
            Circle(SKETCH9_R)
        with Locations(Location((7.053423028, 9.708203932, 0), (0, 0, 270))):
            Circle(SKETCH9_R_2, mode=Mode.SUBTRACT)
    # profile 5 of 5: a face of its own
    with BuildSketch(Plane.XZ.offset(-16).offset(BOSS_EXTRUDE6_START)):
        with Locations(Location((11.412678196, -3.708203932, 0), (0, 0, 90))):
            Circle(SKETCH9_R)
        with Locations(Location((11.412678196, -3.708203932, 0), (0, 0, 270))):
            Circle(SKETCH9_R_2, mode=Mode.SUBTRACT)
    extrude(amount=-BOSS_EXTRUDE6_DEPTH)

    # Fillet5
    # the kernel refuses this fillet: 1 mm, written as the material it adds along each edge
    with BuildSketch(Plane(origin=(0, 16, -12), x_dir=(0, 0, 1), z_dir=(1, 0, 0))) as fillet5_piece_1:
        with BuildLine():
            CenterArc((3.468245837, 1), FILLET5_R, 194.477512186, 75.522487814)
            Line((2.5, 0.75), (2.480635083, 0.745))
            ThreePointArc((2.480635083, 0.745), (2.48, 0.375), (2.48, 0))
            Line((2.48, 0), (2.5, -0.02))
            Line((2.5, -0.02), (3.468245837, -0.02))
            Line((3.468245837, -0.02), (3.468245837, 0))
        make_face()
    revolve(axis=Axis((0, 16, -12), (0, -1, 0)))
    with BuildSketch(Plane(origin=(-11.412678196, 16, -3.708203932), x_dir=(0, 0, 1), z_dir=(1, 0, 0))) as fillet5_piece_2:
        with BuildLine():
            CenterArc((3.468245837, 1), FILLET5_R, 194.477512186, 75.522487814)
            Line((2.5, 0.75), (2.480635083, 0.745))
            ThreePointArc((2.480635083, 0.745), (2.48, 0.375), (2.48, 0))
            Line((2.48, 0), (2.5, -0.02))
            Line((2.5, -0.02), (3.468245837, -0.02))
            Line((3.468245837, -0.02), (3.468245837, 0))
        make_face()
    revolve(axis=Axis((-11.412678196, 16, -3.708203932), (0, -1, 0)))
    with BuildSketch(Plane(origin=(-7.053423028, 16, 9.708203932), x_dir=(0, 0, 1), z_dir=(1, 0, 0))) as fillet5_piece_3:
        with BuildLine():
            CenterArc((3.468245837, 1), FILLET5_R, 194.477512186, 75.522487814)
            Line((2.5, 0.75), (2.480635083, 0.745))
            ThreePointArc((2.480635083, 0.745), (2.48, 0.375), (2.48, 0))
            Line((2.48, 0), (2.5, -0.02))
            Line((2.5, -0.02), (3.468245837, -0.02))
            Line((3.468245837, -0.02), (3.468245837, 0))
        make_face()
    revolve(axis=Axis((-7.053423028, 16, 9.708203932), (0, -1, 0)))
    with BuildSketch(Plane(origin=(7.053423028, 16, 9.708203932), x_dir=(0, 0, 1), z_dir=(1, 0, 0))) as fillet5_piece_4:
        with BuildLine():
            CenterArc((3.468245837, 1), FILLET5_R, 194.477512186, 75.522487814)
            Line((2.5, 0.75), (2.480635083, 0.745))
            ThreePointArc((2.480635083, 0.745), (2.48, 0.375), (2.48, 0))
            Line((2.48, 0), (2.5, -0.02))
            Line((2.5, -0.02), (3.468245837, -0.02))
            Line((3.468245837, -0.02), (3.468245837, 0))
        make_face()
    revolve(axis=Axis((7.053423028, 16, 9.708203932), (0, -1, 0)))
    with BuildSketch(Plane(origin=(11.412678196, 16, -3.708203932), x_dir=(0, 0, 1), z_dir=(1, 0, 0))) as fillet5_piece_5:
        with BuildLine():
            CenterArc((3.468245837, 1), FILLET5_R, 194.477512186, 75.522487814)
            Line((2.5, 0.75), (2.480635083, 0.745))
            ThreePointArc((2.480635083, 0.745), (2.48, 0.375), (2.48, 0))
            Line((2.48, 0), (2.5, -0.02))
            Line((2.5, -0.02), (3.468245837, -0.02))
            Line((3.468245837, -0.02), (3.468245837, 0))
        make_face()
    revolve(axis=Axis((11.412678196, 16, -3.708203932), (0, -1, 0)))

    # Sketch12 → Cut-Extrude5 (cut)
    with BuildSketch(Plane(origin=(0, 21, 0), x_dir=(1, 0, 0), z_dir=(0, 1, 0))):
        with Locations(Location((0, 12, 0), (0, 0, 270))):
            Circle(SKETCH12_R)
        with Locations(Location((11.412678196, 3.708203932, 0), (0, 0, 270))):
            Circle(SKETCH12_R)
        with Locations(Location((7.053423028, -9.708203932, 0), (0, 0, 270))):
            Circle(SKETCH12_R)
        with Locations(Location((-7.053423028, -9.708203932, 0), (0, 0, 270))):
            Circle(SKETCH12_R)
        with Locations(Location((-11.412678196, 3.708203932, 0), (0, 0, 270))):
            Circle(SKETCH12_R)
    extrude(amount=-CUT_EXTRUDE5_DEPTH, mode=Mode.SUBTRACT)

    # Sketch10 → Cut-Extrude3 (cut)
    with BuildSketch(Plane(origin=(0, 21, 0), x_dir=(1, 0, 0), z_dir=(0, 1, 0))):
        with Locations(Location((0, 0, 0), (0, 0, 270))):
            Circle(SKETCH10_R)
    extrude(amount=-CUT_EXTRUDE3_DEPTH, mode=Mode.SUBTRACT)

    # Sketch11 → Cut-Extrude4 (cut)
    with BuildSketch(Plane.XZ.offset(CUT_EXTRUDE4_START)):
        with Locations(Location((0, 0, 0), (0, 0, 90))):
            Circle(SKETCH11_R)
    extrude(amount=CUT_EXTRUDE4_DEPTH, mode=Mode.SUBTRACT)


solid = part.part
